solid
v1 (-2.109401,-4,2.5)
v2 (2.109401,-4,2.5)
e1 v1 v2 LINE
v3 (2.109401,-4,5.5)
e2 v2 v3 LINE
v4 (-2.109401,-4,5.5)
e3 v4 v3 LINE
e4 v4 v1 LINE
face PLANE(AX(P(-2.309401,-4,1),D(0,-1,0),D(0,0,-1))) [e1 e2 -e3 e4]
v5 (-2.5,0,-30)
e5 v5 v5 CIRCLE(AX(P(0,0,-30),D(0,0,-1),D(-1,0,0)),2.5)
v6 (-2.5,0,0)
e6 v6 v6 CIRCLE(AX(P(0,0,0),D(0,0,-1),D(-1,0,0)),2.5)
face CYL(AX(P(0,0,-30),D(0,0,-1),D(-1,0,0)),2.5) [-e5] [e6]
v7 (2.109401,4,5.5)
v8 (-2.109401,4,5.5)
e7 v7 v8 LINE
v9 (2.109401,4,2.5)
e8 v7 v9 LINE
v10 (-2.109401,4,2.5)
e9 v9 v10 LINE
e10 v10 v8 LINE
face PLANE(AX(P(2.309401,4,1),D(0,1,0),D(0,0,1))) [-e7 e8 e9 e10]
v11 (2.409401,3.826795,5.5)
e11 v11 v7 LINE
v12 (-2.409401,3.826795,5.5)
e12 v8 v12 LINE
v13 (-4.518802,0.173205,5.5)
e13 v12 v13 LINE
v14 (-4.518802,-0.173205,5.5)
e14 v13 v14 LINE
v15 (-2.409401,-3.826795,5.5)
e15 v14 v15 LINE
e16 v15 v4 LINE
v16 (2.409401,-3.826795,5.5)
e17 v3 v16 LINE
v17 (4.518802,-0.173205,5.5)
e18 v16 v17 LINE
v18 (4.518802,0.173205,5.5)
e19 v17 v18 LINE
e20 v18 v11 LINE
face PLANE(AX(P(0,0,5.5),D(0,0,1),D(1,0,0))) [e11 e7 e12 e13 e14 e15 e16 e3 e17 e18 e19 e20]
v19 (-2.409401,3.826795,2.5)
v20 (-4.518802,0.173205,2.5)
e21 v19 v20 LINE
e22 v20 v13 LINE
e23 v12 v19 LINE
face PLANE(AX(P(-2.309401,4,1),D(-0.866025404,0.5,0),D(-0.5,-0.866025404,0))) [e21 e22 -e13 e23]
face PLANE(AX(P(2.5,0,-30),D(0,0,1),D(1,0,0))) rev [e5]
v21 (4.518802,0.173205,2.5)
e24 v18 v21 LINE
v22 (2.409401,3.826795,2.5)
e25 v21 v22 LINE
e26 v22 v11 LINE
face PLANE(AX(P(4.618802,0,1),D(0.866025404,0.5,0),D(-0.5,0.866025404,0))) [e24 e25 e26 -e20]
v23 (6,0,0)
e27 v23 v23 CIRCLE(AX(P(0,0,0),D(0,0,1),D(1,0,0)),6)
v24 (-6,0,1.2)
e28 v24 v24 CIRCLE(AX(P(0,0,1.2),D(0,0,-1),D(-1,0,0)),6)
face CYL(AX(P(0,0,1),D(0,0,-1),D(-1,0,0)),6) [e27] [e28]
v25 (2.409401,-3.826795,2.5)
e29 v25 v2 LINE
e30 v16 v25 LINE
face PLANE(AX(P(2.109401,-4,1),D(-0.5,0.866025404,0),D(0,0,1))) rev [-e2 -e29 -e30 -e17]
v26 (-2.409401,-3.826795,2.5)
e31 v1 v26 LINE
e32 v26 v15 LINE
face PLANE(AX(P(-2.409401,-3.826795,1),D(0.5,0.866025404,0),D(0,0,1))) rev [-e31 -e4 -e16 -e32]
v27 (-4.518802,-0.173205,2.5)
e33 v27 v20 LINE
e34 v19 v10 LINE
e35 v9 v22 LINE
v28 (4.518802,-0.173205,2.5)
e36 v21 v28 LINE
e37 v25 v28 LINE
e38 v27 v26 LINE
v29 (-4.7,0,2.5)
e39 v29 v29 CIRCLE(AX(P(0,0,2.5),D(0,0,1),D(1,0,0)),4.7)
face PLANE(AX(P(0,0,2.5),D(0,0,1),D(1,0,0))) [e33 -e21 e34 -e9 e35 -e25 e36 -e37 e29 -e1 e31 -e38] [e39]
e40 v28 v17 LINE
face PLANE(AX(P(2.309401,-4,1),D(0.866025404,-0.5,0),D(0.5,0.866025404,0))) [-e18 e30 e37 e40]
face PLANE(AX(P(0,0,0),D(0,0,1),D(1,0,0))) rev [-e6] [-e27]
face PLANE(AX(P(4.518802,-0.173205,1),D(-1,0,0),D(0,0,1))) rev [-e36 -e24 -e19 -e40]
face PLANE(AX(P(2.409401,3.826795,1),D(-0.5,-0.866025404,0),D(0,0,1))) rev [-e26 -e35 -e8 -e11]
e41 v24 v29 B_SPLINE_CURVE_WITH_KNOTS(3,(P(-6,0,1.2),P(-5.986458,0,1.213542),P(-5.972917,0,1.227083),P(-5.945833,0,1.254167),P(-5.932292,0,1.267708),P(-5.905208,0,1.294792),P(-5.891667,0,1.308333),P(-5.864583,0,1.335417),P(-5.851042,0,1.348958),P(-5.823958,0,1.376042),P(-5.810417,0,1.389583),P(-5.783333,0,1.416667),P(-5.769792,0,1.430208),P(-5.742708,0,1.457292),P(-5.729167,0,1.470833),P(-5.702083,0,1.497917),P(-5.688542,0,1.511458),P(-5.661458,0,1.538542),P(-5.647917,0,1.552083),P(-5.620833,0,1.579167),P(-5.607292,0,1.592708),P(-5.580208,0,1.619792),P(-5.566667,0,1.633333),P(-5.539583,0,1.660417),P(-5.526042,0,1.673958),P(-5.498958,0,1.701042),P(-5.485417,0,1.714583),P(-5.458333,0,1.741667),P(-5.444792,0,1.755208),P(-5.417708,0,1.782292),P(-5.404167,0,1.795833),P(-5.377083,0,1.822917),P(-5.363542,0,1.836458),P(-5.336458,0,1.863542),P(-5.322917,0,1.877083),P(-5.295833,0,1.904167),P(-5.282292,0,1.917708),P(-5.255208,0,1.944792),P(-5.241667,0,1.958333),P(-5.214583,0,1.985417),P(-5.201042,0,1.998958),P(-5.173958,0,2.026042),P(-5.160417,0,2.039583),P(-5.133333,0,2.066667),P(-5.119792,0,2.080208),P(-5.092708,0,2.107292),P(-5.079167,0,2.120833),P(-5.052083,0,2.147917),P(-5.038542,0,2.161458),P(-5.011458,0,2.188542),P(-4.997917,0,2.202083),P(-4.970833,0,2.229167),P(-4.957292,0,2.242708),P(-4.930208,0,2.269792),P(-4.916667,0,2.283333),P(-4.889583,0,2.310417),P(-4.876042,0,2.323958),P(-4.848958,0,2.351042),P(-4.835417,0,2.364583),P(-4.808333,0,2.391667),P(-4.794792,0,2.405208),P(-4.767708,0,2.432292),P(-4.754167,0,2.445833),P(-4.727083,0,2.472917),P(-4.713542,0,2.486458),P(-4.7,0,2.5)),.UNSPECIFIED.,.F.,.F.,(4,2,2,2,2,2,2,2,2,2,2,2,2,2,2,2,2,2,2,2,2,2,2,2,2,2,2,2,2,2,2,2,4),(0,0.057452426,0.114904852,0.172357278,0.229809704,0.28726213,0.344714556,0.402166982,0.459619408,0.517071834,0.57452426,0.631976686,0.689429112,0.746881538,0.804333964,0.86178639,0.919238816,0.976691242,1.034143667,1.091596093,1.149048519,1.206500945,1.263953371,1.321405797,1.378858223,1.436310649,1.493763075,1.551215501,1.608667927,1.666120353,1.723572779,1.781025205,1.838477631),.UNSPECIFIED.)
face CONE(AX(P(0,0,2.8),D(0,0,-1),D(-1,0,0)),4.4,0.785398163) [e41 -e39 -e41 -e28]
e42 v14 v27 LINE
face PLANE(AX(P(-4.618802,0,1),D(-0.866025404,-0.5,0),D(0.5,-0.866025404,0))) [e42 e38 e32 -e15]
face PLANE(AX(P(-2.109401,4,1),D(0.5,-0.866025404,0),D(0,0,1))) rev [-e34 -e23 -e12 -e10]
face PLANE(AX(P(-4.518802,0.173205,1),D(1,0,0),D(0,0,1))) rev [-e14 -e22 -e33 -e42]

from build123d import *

# Parameters (mm, degrees)
SKETCH1_W                = 2.5
SKETCH1_H                = 30
SKETCH2_R                = 6
BOSS_EXTRUDE1_DEPTH      = 1
SKETCH3_R                = 4.4
BOSS_EXTRUDE2_DEPTH      = 1.5
CHAMFER1_SIZE            = 1.8
BOSS_EXTRUDE3_DEPTH      = 3
BOSS_EXTRUDE3_DEPTH_BACK = 1.5
CHAMFER2_SIZE            = 0.2
CHAMFER2_EDGE_2_SIZE     = 0.2
CHAMFER2_EDGE_3_SIZE     = 0.2
CHAMFER2_EDGE_4_SIZE     = 0.2
CHAMFER2_EDGE_5_SIZE     = 0.2
CHAMFER2_EDGE_6_SIZE     = 0.2


with BuildPart() as part:
    # Sketch1 → Revolve1 (revolve)
    with BuildSketch(Plane(origin=(0, 0, 0), x_dir=(1, 0, 0), z_dir=(0, 1, 0)), mode=Mode.PRIVATE) as revolve1_sk:
        with Locations((1.25, 15)):
            Rectangle(SKETCH1_W, SKETCH1_H)
    revolve(revolve1_sk.sketch.rotate(Axis((0, 0, -30), (0, 0, 1)), 180), axis=Axis((0, 0, -30), (0, 0, 1)))

    # Sketch2 → Boss-Extrude1 (add)
    with BuildSketch(Plane.XY):
        Circle(SKETCH2_R)
    extrude(amount=BOSS_EXTRUDE1_DEPTH)

    # Sketch3 → Boss-Extrude2 (add)
    with BuildSketch(Plane.XY.offset(1)):
        Circle(SKETCH3_R)
    extrude(amount=BOSS_EXTRUDE2_DEPTH)

    # Chamfer1
    # the kernel refuses this chamfer: 1.8 mm, written as the material it adds along each edge
    with BuildSketch(Plane(origin=(0, 0, 1), x_dir=(1, 0, 0), z_dir=(0, -1, 0))) as chamfer1_piece_1_section:
        Polygon((4.4 + CHAMFER1_SIZE, 0), (4.4, CHAMFER1_SIZE), (4.4, 0), align=None)
    chamfer1_piece_1 = revolve(axis=Axis((0, 0, 1), (0, 0, 1)), mode=Mode.PRIVATE)
    chamfer1_piece_1 = chamfer1_piece_1 & Plane(origin=(0, 0, 1.82351745), x_dir=(1, 0, 0), z_dir=(0, 0, -1)) * Cylinder(6, 25, mode=Mode.PRIVATE)
    chamfer1_piece_1 = split(chamfer1_piece_1, bisect_by=Plane(origin=(-5.32351745, 0, 2.5), z_dir=(0, 0, -1)), keep=Keep.TOP, mode=Mode.PRIVATE)
    add(chamfer1_piece_1)

    # Sketch4 → Boss-Extrude3 (add, two sides: drawn at the far end of the back side and taken through both)
    with BuildSketch(Plane.XY.offset(2.5).offset(-BOSS_EXTRUDE3_DEPTH_BACK)):
        Polygon((-2.309401077, 4), (-4.618802154, 0), (-2.309401077, -4), (2.309401077, -4), (4.618802154, 0), (2.309401077, 4), align=None)
    extrude(amount=BOSS_EXTRUDE3_DEPTH + BOSS_EXTRUDE3_DEPTH_BACK)

    # Chamfer2
    chamfer2_edges = [part.edges().sort_by_distance(p)[0] for p in [
        (-2.309401077, 4, 4),
    ]]
    chamfer(chamfer2_edges, length=CHAMFER2_SIZE)

    # Chamfer2 edge 2
    chamfer2_edge_2_edges = [part.edges().sort_by_distance(p)[0] for p in [
        (2.309401077, 4, 4),
    ]]
    chamfer(chamfer2_edge_2_edges, length=CHAMFER2_EDGE_2_SIZE)

    # Chamfer2 edge 3
    chamfer2_edge_3_edges = [part.edges().sort_by_distance(p)[0] for p in [
        (4.618802154, 0, 4),
    ]]
    chamfer(chamfer2_edge_3_edges, length=CHAMFER2_EDGE_3_SIZE)

    # Chamfer2 edge 4
    chamfer2_edge_4_edges = [part.edges().sort_by_distance(p)[0] for p in [
        (2.309401077, -4, 4),
    ]]
    chamfer(chamfer2_edge_4_edges, length=CHAMFER2_EDGE_4_SIZE)

    # Chamfer2 edge 5
    chamfer2_edge_5_edges = [part.edges().sort_by_distance(p)[0] for p in [
        (-2.309401077, -4, 4),
    ]]
    chamfer(chamfer2_edge_5_edges, length=CHAMFER2_EDGE_5_SIZE)

    # Chamfer2 edge 6
    chamfer2_edge_6_edges = [part.edges().sort_by_distance(p)[0] for p in [
        (-4.618802154, 0, 4),
    ]]
    chamfer(chamfer2_edge_6_edges, length=CHAMFER2_EDGE_6_SIZE)


solid = part.part
